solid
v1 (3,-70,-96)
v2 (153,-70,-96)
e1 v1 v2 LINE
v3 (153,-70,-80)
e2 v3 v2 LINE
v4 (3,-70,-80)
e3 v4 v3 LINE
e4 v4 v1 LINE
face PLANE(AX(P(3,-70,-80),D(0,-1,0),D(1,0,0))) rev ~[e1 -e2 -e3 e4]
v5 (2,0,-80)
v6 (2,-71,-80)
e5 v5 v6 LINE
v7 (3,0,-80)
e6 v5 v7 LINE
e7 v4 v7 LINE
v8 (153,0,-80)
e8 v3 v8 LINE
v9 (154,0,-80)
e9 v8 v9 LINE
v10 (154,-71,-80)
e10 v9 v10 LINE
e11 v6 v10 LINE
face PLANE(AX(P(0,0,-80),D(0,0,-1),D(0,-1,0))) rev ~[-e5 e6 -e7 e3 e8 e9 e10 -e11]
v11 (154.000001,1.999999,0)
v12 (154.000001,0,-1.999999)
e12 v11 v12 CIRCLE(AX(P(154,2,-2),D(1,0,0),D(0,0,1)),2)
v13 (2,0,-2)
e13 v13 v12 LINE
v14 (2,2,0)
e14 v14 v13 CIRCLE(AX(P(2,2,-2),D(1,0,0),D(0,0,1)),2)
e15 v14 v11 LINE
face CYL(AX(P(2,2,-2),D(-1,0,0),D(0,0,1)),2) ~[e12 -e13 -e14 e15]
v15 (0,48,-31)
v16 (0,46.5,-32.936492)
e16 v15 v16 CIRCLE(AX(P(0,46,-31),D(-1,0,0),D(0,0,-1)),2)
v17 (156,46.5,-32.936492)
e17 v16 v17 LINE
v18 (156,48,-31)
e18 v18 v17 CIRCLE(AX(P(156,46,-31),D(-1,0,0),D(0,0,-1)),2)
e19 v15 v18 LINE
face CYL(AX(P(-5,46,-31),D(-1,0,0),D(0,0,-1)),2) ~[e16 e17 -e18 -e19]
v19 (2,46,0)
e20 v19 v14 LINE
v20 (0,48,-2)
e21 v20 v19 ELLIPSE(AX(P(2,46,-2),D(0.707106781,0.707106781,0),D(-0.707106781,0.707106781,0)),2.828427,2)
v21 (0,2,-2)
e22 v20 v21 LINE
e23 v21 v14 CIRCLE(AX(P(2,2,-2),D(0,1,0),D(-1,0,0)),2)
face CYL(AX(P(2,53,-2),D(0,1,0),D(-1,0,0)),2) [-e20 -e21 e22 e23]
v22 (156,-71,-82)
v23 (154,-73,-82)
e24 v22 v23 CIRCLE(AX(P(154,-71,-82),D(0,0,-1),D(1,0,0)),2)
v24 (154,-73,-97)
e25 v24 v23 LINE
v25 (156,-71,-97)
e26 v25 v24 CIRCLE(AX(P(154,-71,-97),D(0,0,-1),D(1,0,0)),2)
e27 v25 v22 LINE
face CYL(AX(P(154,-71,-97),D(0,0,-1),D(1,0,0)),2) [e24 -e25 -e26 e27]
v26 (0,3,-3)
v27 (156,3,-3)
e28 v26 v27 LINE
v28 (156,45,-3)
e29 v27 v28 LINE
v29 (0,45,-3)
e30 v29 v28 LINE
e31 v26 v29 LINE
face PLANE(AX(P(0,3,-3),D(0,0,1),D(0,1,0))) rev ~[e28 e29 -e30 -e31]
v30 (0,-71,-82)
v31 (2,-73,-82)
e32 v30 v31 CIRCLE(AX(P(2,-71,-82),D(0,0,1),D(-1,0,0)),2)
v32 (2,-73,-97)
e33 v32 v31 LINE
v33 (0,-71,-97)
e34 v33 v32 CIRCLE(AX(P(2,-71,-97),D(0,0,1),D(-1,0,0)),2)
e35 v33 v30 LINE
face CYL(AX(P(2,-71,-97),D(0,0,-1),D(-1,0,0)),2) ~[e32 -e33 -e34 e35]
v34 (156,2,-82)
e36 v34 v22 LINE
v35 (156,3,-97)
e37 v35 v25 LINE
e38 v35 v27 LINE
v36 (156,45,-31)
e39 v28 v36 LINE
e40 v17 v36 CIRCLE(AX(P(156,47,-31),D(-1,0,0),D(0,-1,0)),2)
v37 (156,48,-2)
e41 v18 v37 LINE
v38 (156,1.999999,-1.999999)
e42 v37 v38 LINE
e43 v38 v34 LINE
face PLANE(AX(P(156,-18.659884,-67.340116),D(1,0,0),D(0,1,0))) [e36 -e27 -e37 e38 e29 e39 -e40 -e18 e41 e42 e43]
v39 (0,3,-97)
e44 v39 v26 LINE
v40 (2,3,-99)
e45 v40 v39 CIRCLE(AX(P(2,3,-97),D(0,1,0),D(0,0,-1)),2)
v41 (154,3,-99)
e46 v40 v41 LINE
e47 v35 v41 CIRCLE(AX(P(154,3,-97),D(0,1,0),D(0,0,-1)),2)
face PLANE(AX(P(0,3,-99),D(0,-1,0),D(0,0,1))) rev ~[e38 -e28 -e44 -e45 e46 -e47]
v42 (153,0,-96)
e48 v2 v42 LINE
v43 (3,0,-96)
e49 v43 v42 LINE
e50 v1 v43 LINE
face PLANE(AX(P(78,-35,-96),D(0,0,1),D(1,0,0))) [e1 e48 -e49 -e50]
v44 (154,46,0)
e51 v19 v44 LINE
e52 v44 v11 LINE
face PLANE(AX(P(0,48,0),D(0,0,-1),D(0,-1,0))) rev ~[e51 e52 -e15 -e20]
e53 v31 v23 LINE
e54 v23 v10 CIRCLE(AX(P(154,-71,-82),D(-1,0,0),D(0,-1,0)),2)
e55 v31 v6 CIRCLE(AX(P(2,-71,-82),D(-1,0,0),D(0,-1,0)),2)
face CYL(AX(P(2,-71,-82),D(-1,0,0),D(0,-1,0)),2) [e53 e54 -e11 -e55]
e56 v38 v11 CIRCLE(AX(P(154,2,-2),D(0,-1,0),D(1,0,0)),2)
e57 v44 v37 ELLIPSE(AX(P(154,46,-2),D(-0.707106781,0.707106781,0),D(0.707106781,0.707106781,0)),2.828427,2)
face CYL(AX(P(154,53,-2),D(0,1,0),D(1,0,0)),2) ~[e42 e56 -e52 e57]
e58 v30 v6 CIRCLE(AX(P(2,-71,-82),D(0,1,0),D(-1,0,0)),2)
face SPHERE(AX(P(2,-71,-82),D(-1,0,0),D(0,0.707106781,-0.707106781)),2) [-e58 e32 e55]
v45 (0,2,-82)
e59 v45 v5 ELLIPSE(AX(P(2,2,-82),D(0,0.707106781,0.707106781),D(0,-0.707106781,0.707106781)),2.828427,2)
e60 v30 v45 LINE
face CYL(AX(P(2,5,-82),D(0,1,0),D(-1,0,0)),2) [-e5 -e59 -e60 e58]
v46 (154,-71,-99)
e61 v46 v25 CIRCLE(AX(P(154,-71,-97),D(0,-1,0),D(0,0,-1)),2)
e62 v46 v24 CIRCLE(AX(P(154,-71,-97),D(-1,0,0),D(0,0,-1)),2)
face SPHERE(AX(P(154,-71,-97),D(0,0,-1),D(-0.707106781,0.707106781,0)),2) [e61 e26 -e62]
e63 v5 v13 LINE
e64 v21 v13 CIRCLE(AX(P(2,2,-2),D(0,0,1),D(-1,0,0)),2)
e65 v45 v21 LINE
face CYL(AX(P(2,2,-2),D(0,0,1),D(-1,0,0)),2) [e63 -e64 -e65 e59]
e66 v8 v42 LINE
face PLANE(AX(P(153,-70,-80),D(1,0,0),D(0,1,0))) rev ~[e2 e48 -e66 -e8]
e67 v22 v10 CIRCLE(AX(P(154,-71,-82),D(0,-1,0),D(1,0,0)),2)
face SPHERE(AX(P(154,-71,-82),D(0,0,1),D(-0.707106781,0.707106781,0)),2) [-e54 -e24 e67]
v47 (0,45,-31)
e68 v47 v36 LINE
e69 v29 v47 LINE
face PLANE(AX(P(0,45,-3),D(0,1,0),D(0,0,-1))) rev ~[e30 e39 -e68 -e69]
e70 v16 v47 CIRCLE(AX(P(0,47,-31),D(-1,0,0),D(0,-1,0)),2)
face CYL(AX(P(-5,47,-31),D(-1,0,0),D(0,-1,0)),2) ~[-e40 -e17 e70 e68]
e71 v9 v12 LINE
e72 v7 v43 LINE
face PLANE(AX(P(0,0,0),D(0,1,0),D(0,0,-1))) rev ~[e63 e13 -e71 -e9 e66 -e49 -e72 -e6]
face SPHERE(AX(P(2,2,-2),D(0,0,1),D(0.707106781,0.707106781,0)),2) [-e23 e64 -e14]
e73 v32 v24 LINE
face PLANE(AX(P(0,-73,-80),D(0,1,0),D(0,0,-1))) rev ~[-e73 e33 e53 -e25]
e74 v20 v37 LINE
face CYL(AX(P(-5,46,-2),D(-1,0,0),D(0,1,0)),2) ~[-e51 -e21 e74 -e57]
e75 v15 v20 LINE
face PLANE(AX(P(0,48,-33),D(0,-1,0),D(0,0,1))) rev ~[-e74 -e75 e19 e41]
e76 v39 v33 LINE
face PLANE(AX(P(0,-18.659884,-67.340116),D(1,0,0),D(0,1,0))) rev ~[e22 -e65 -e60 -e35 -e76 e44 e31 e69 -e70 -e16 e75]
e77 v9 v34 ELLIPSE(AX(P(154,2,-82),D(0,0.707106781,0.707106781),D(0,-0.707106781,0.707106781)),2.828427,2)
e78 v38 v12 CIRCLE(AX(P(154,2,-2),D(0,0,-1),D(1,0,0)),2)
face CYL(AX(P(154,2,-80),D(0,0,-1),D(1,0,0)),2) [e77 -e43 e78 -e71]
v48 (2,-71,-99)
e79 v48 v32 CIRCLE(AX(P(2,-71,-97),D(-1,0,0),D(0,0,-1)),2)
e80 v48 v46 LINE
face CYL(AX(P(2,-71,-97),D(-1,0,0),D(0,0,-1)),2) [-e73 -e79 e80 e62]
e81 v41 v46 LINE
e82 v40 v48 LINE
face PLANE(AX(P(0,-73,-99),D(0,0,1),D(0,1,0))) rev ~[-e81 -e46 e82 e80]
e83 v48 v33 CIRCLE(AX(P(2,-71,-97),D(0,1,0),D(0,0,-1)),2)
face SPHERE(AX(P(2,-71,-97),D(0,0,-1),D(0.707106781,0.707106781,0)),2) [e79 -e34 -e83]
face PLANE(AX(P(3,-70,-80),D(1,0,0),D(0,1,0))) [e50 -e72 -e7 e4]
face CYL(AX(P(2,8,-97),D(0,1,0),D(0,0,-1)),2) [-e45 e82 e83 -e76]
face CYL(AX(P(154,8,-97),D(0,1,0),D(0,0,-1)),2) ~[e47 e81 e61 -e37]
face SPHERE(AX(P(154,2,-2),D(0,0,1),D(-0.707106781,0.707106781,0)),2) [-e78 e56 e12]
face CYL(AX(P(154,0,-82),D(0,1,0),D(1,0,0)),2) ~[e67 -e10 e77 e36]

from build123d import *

# Parameters (mm, degrees)
F1_DEPTH     = 156
F2_W         = 150
F2_H         = 70
F3_DEPTH     = 16
F4_T1_DEPTH  = 152
F4_T3_DEPTH  = 51
F4_T5_DEPTH  = 166
F4_T7_DEPTH  = 78
F4_T9_DEPTH  = 71
F4_T11_DEPTH = 79
F4_T13_DEPTH = 15
F4_S17_W     = 2
F4_S17_H     = 2
F4_T18_DEPTH = 2
F4_S23_W     = 2
F4_S23_H     = 2
F4_T24_DEPTH = 2
F4_S29_W     = 2
F4_S29_H     = 2
F4_T30_DEPTH = 2
F4_S35_W     = 2
F4_S35_H     = 2
F4_T36_DEPTH = 2
F4_S41_W     = 2
F4_S41_H     = 2
F4_T42_DEPTH = 2
F4_S47_W     = 2
F4_S47_H     = 2
F4_T48_DEPTH = 2
F4_T55_DEPTH = 83
F4_T59_DEPTH = 76
F4_T66_DEPTH = 83
F4_T70_DEPTH = 76


# Not quite as in the source:
# - a fillet or chamfer that OpenCascade refuses, or shapes differently, is made with other operations: its cross-section is extruded or revolved along the edge and cut away or added


with BuildPart() as f1:
    # F0 (on Right) → F1 (new body)
    with BuildSketch(Plane.YZ):
        Polygon((3, -99), (3, -3), (0, -3), (0, -80), (-73, -80), (-73, -99), align=None)
        Polygon((0, -3), (3, -3), (45, -3), (45, 0), (0, 0), align=None)
        Polygon((45, 0), (45, -3), (45, -33), (48, -33), (48, 0), align=None)
    extrude(amount=F1_DEPTH)

    # F2 (on face) → F3 (cut)
    with BuildSketch(Plane.XY.offset(-80)):
        with Locations((78, -35)):
            Rectangle(F2_W, F2_H)
    extrude(amount=-F3_DEPTH, mode=Mode.SUBTRACT)

    # F4: fillet of radius 2 on 16 edges, made by hand

    # F4_s2 → F4_t1 (cut)
    with BuildSketch(Plane.YZ.offset(2)):
        with BuildLine():
            ThreePointArc((2, 0), (0.5857864376, -0.5857864376), (0, -2))
            Line((0, -2), (0, 0))
            Line((0, 0), (2, 0))
        make_face()
        with BuildLine():
            ThreePointArc((-73, -82), (-72.4142135624, -80.5857864376), (-71, -80))
            Line((-71, -80), (-73, -80))
            Line((-73, -80), (-73, -82))
        make_face()
        with BuildLine():
            ThreePointArc((-71, -99), (-72.4142135624, -98.4142135624), (-73, -97))
            Line((-73, -97), (-73, -99))
            Line((-73, -99), (-71, -99))
        make_face()
    extrude(amount=F4_T1_DEPTH, mode=Mode.SUBTRACT)

    # F4_s4 → F4_t3 (cut)
    with BuildSketch(Plane.XZ.offset(-53)):
        with BuildLine():
            ThreePointArc((156, -2), (155.4142135624, -0.5857864376), (154, 0))
            Line((154, 0), (156, 0))
            Line((156, 0), (156, -2))
        make_face()
        with BuildLine():
            ThreePointArc((0, -2), (0.5857864376, -0.5857864376), (2, 0))
            Line((2, 0), (0, 0))
            Line((0, 0), (0, -2))
        make_face()
    extrude(amount=F4_T3_DEPTH, mode=Mode.SUBTRACT)

    # F4_s6 → F4_t5 (cut)
    with BuildSketch(Plane.YZ.offset(-5)):
        with BuildLine():
            ThreePointArc((48, -2), (47.4142135624, -0.5857864376), (46, 0))
            Line((46, 0), (48, 0))
            Line((48, 0), (48, -2))
        make_face()
        with BuildLine():
            ThreePointArc((46, -33), (47.4142135624, -32.4142135624), (48, -31))
            Line((48, -31), (48, -33))
            Line((48, -33), (46, -33))
        make_face()
        with BuildLine():
            ThreePointArc((45, -31), (45.5857864376, -32.4142135624), (47, -33))
            Line((47, -33), (45, -33))
            Line((45, -33), (45, -31))
        make_face()
    extrude(amount=F4_T5_DEPTH, mode=Mode.SUBTRACT)

    # F4_s8 → F4_t7 (cut)
    with BuildSketch(Plane.XY.offset(-80)):
        with BuildLine():
            ThreePointArc((156, 2), (155.4142135624, 0.5857864376), (154, 0))
            Line((154, 0), (156, 0))
            Line((156, 0), (156, 2))
        make_face()
        with BuildLine():
            ThreePointArc((0, 2), (0.5857864376, 0.5857864376), (2, 0))
            Line((2, 0), (0, 0))
            Line((0, 0), (0, 2))
        make_face()
    extrude(amount=F4_T7_DEPTH, mode=Mode.SUBTRACT)

    # F4_s10 → F4_t9 (cut)
    with BuildSketch(Plane.XZ):
        with BuildLine():
            ThreePointArc((156, -82), (155.4142135624, -80.5857864376), (154, -80))
            Line((154, -80), (156, -80))
            Line((156, -80), (156, -82))
        make_face()
        with BuildLine():
            ThreePointArc((0, -82), (0.5857864376, -80.5857864376), (2, -80))
            Line((2, -80), (0, -80))
            Line((0, -80), (0, -82))
        make_face()
    extrude(amount=F4_T9_DEPTH, mode=Mode.SUBTRACT)

    # F4_s12 → F4_t11 (cut)
    with BuildSketch(Plane.XZ.offset(-8)):
        with BuildLine():
            ThreePointArc((154, -99), (155.4142135624, -98.4142135624), (156, -97))
            Line((156, -97), (156, -99))
            Line((156, -99), (154, -99))
        make_face()
        with BuildLine():
            ThreePointArc((2, -99), (0.5857864376, -98.4142135624), (0, -97))
            Line((0, -97), (0, -99))
            Line((0, -99), (2, -99))
        make_face()
    extrude(amount=F4_T11_DEPTH, mode=Mode.SUBTRACT)

    # F4_s14 → F4_t13 (cut)
    with BuildSketch(Plane.XY.offset(-97)):
        with BuildLine():
            ThreePointArc((0, -71), (0.5857864376, -72.4142135624), (2, -73))
            Line((2, -73), (0, -73))
            Line((0, -73), (0, -71))
        make_face()
        with BuildLine():
            ThreePointArc((156, -71), (155.4142135624, -72.4142135624), (154, -73))
            Line((154, -73), (156, -73))
            Line((156, -73), (156, -71))
        make_face()
    extrude(amount=F4_T13_DEPTH, mode=Mode.SUBTRACT)


with BuildPart() as f4_tool16:
    # F4_s17 → F4_t18 (new body)
    with BuildSketch(Plane.XY.offset(-2)):
        with Locations((1, 1)):
            Rectangle(F4_S17_W, F4_S17_H)
    extrude(amount=F4_T18_DEPTH)

    # F4_s19 → F4_t20 (revolve, cut)
    with BuildSketch(Plane(origin=(2, 2, -2), x_dir=(0.7071067812, 0.7071067812, 0), z_dir=(0.7071067812, -0.7071067812, 0))):
        with BuildLine():
            ThreePointArc((0, -2), (2, 0), (0, 2))
            Line((0, 2), (0, -2))
        make_face()
    revolve(axis=Axis((2, 2, -2), (0, 0, 1)), mode=Mode.SUBTRACT)


with BuildPart() as f1_1:
    add(f1.part)

    # F4_t15: cut F4_tool16
    add(f4_tool16.part, mode=Mode.SUBTRACT)


with BuildPart() as f4_tool22:
    # F4_s23 → F4_t24 (new body)
    with BuildSketch(Plane.XY.offset(-2)):
        with Locations((155, 1)):
            Rectangle(F4_S23_W, F4_S23_H)
    extrude(amount=F4_T24_DEPTH)

    # F4_s25 → F4_t26 (revolve, cut)
    with BuildSketch(Plane(origin=(154, 2, -2), x_dir=(-0.7071067812, 0.7071067812, 0), z_dir=(0.7071067812, 0.7071067812, 0))):
        with BuildLine():
            ThreePointArc((0, -2), (2, 0), (0, 2))
            Line((0, 2), (0, -2))
        make_face()
    revolve(axis=Axis((154, 2, -2), (0, 0, 1)), mode=Mode.SUBTRACT)


with BuildPart() as f1_2:
    add(f1_1.part)

    # F4_t21: cut F4_tool22
    add(f4_tool22.part, mode=Mode.SUBTRACT)


with BuildPart() as f4_tool28:
    # F4_s29 → F4_t30 (new body)
    with BuildSketch(Plane.XY.offset(-82)):
        with Locations((155, -72)):
            Rectangle(F4_S29_W, F4_S29_H)
    extrude(amount=F4_T30_DEPTH)

    # F4_s31 → F4_t32 (revolve, cut)
    with BuildSketch(Plane(origin=(154, -71, -82), x_dir=(-0.7071067812, 0.7071067812, 0), z_dir=(0.7071067812, 0.7071067812, 0))):
        with BuildLine():
            ThreePointArc((0, -2), (2, 0), (0, 2))
            Line((0, 2), (0, -2))
        make_face()
    revolve(axis=Axis((154, -71, -82), (0, 0, 1)), mode=Mode.SUBTRACT)


with BuildPart() as f1_3:
    add(f1_2.part)

    # F4_t27: cut F4_tool28
    add(f4_tool28.part, mode=Mode.SUBTRACT)


with BuildPart() as f4_tool34:
    # F4_s35 → F4_t36 (new body)
    with BuildSketch(Plane.YZ.offset(2)):
        with Locations((-72, -81)):
            Rectangle(F4_S35_W, F4_S35_H)
    extrude(amount=-F4_T36_DEPTH)

    # F4_s37 → F4_t38 (revolve, cut)
    with BuildSketch(Plane(origin=(2, -71, -82), x_dir=(0, 0.7071067812, -0.7071067812), z_dir=(0, 0.7071067812, 0.7071067812))):
        with BuildLine():
            ThreePointArc((0, -2), (2, 0), (0, 2))
            Line((0, 2), (0, -2))
        make_face()
    revolve(axis=Axis((2, -71, -82), (-1, 0, 0)), mode=Mode.SUBTRACT)


with BuildPart() as f1_4:
    add(f1_3.part)

    # F4_t33: cut F4_tool34
    add(f4_tool34.part, mode=Mode.SUBTRACT)


with BuildPart() as f4_tool40:
    # F4_s41 → F4_t42 (new body)
    with BuildSketch(Plane.XY.offset(-97)):
        with Locations((1, -72)):
            Rectangle(F4_S41_W, F4_S41_H)
    extrude(amount=-F4_T42_DEPTH)

    # F4_s43 → F4_t44 (revolve, cut)
    with BuildSketch(Plane(origin=(2, -71, -97), x_dir=(0.7071067812, 0.7071067812, 0), z_dir=(-0.7071067812, 0.7071067812, 0))):
        with BuildLine():
            ThreePointArc((0, -2), (2, 0), (0, 2))
            Line((0, 2), (0, -2))
        make_face()
    revolve(axis=Axis((2, -71, -97), (0, 0, -1)), mode=Mode.SUBTRACT)


with BuildPart() as f1_5:
    add(f1_4.part)

    # F4_t39: cut F4_tool40
    add(f4_tool40.part, mode=Mode.SUBTRACT)


with BuildPart() as f4_tool46:
    # F4_s47 → F4_t48 (new body)
    with BuildSketch(Plane.XY.offset(-97)):
        with Locations((155, -72)):
            Rectangle(F4_S47_W, F4_S47_H)
    extrude(amount=-F4_T48_DEPTH)

    # F4_s49 → F4_t50 (revolve, cut)
    with BuildSketch(Plane(origin=(154, -71, -97), x_dir=(-0.7071067812, 0.7071067812, 0), z_dir=(-0.7071067812, -0.7071067812, 0))):
        with BuildLine():
            ThreePointArc((0, -2), (2, 0), (0, 2))
            Line((0, 2), (0, -2))
        make_face()
    revolve(axis=Axis((154, -71, -97), (0, 0, -1)), mode=Mode.SUBTRACT)


with BuildPart() as f1_6:
    add(f1_5.part)

    # F4_t45: cut F4_tool46
    add(f4_tool46.part, mode=Mode.SUBTRACT)


with BuildPart() as f4_tool53:
    # F4_s54 → F4_t55 (new body)
    with BuildSketch(Plane.XY.offset(-2)):
        with BuildLine():
            ThreePointArc((156, 2), (155.4142135624, 0.5857864376), (154, 0))
            Line((154, 0), (156, 0))
            Line((156, 0), (156, 2))
        make_face()
    extrude(amount=-F4_T55_DEPTH)

    split(bisect_by=Plane.XY.offset(-80), keep=Keep.BOTTOM)


with BuildPart() as f4_tool57:
    # F4_s58 → F4_t59 (new body)
    with BuildSketch(Plane.XZ.offset(-5)):
        with BuildLine():
            ThreePointArc((156, -82), (155.4142135624, -80.5857864376), (154, -80))
            Line((154, -80), (156, -80))
            Line((156, -80), (156, -82))
        make_face()
    extrude(amount=F4_T59_DEPTH)

    split(bisect_by=Plane.XZ, keep=Keep.BOTTOM)


with BuildPart() as f4_tool53_1:
    add(f4_tool53.part)

    # F4_t61: intersect F4_tool57
    add(f4_tool57.part, mode=Mode.INTERSECT)


with BuildPart() as f1_7:
    add(f1_6.part)

    # F4_t51: cut F4_tool53
    add(f4_tool53_1.part, mode=Mode.SUBTRACT)


with BuildPart() as f4_tool64:
    # F4_s65 → F4_t66 (new body)
    with BuildSketch(Plane.XY.offset(-2)):
        with BuildLine():
            ThreePointArc((0, 2), (0.5857864376, 0.5857864376), (2, 0))
            Line((2, 0), (0, 0))
            Line((0, 0), (0, 2))
        make_face()
    extrude(amount=-F4_T66_DEPTH)

    split(bisect_by=Plane.XY.offset(-80), keep=Keep.BOTTOM)


with BuildPart() as f4_tool68:
    # F4_s69 → F4_t70 (new body)
    with BuildSketch(Plane.XZ.offset(-5)):
        with BuildLine():
            ThreePointArc((0, -82), (0.5857864376, -80.5857864376), (2, -80))
            Line((2, -80), (0, -80))
            Line((0, -80), (0, -82))
        make_face()
    extrude(amount=F4_T70_DEPTH)

    split(bisect_by=Plane.XZ, keep=Keep.BOTTOM)


with BuildPart() as f4_tool64_1:
    add(f4_tool64.part)

    # F4_t72: intersect F4_tool68
    add(f4_tool68.part, mode=Mode.INTERSECT)


with BuildPart() as f1_8:
    add(f1_7.part)

    # F4_t62: cut F4_tool64
    add(f4_tool64_1.part, mode=Mode.SUBTRACT)


solid = f1_8.part
